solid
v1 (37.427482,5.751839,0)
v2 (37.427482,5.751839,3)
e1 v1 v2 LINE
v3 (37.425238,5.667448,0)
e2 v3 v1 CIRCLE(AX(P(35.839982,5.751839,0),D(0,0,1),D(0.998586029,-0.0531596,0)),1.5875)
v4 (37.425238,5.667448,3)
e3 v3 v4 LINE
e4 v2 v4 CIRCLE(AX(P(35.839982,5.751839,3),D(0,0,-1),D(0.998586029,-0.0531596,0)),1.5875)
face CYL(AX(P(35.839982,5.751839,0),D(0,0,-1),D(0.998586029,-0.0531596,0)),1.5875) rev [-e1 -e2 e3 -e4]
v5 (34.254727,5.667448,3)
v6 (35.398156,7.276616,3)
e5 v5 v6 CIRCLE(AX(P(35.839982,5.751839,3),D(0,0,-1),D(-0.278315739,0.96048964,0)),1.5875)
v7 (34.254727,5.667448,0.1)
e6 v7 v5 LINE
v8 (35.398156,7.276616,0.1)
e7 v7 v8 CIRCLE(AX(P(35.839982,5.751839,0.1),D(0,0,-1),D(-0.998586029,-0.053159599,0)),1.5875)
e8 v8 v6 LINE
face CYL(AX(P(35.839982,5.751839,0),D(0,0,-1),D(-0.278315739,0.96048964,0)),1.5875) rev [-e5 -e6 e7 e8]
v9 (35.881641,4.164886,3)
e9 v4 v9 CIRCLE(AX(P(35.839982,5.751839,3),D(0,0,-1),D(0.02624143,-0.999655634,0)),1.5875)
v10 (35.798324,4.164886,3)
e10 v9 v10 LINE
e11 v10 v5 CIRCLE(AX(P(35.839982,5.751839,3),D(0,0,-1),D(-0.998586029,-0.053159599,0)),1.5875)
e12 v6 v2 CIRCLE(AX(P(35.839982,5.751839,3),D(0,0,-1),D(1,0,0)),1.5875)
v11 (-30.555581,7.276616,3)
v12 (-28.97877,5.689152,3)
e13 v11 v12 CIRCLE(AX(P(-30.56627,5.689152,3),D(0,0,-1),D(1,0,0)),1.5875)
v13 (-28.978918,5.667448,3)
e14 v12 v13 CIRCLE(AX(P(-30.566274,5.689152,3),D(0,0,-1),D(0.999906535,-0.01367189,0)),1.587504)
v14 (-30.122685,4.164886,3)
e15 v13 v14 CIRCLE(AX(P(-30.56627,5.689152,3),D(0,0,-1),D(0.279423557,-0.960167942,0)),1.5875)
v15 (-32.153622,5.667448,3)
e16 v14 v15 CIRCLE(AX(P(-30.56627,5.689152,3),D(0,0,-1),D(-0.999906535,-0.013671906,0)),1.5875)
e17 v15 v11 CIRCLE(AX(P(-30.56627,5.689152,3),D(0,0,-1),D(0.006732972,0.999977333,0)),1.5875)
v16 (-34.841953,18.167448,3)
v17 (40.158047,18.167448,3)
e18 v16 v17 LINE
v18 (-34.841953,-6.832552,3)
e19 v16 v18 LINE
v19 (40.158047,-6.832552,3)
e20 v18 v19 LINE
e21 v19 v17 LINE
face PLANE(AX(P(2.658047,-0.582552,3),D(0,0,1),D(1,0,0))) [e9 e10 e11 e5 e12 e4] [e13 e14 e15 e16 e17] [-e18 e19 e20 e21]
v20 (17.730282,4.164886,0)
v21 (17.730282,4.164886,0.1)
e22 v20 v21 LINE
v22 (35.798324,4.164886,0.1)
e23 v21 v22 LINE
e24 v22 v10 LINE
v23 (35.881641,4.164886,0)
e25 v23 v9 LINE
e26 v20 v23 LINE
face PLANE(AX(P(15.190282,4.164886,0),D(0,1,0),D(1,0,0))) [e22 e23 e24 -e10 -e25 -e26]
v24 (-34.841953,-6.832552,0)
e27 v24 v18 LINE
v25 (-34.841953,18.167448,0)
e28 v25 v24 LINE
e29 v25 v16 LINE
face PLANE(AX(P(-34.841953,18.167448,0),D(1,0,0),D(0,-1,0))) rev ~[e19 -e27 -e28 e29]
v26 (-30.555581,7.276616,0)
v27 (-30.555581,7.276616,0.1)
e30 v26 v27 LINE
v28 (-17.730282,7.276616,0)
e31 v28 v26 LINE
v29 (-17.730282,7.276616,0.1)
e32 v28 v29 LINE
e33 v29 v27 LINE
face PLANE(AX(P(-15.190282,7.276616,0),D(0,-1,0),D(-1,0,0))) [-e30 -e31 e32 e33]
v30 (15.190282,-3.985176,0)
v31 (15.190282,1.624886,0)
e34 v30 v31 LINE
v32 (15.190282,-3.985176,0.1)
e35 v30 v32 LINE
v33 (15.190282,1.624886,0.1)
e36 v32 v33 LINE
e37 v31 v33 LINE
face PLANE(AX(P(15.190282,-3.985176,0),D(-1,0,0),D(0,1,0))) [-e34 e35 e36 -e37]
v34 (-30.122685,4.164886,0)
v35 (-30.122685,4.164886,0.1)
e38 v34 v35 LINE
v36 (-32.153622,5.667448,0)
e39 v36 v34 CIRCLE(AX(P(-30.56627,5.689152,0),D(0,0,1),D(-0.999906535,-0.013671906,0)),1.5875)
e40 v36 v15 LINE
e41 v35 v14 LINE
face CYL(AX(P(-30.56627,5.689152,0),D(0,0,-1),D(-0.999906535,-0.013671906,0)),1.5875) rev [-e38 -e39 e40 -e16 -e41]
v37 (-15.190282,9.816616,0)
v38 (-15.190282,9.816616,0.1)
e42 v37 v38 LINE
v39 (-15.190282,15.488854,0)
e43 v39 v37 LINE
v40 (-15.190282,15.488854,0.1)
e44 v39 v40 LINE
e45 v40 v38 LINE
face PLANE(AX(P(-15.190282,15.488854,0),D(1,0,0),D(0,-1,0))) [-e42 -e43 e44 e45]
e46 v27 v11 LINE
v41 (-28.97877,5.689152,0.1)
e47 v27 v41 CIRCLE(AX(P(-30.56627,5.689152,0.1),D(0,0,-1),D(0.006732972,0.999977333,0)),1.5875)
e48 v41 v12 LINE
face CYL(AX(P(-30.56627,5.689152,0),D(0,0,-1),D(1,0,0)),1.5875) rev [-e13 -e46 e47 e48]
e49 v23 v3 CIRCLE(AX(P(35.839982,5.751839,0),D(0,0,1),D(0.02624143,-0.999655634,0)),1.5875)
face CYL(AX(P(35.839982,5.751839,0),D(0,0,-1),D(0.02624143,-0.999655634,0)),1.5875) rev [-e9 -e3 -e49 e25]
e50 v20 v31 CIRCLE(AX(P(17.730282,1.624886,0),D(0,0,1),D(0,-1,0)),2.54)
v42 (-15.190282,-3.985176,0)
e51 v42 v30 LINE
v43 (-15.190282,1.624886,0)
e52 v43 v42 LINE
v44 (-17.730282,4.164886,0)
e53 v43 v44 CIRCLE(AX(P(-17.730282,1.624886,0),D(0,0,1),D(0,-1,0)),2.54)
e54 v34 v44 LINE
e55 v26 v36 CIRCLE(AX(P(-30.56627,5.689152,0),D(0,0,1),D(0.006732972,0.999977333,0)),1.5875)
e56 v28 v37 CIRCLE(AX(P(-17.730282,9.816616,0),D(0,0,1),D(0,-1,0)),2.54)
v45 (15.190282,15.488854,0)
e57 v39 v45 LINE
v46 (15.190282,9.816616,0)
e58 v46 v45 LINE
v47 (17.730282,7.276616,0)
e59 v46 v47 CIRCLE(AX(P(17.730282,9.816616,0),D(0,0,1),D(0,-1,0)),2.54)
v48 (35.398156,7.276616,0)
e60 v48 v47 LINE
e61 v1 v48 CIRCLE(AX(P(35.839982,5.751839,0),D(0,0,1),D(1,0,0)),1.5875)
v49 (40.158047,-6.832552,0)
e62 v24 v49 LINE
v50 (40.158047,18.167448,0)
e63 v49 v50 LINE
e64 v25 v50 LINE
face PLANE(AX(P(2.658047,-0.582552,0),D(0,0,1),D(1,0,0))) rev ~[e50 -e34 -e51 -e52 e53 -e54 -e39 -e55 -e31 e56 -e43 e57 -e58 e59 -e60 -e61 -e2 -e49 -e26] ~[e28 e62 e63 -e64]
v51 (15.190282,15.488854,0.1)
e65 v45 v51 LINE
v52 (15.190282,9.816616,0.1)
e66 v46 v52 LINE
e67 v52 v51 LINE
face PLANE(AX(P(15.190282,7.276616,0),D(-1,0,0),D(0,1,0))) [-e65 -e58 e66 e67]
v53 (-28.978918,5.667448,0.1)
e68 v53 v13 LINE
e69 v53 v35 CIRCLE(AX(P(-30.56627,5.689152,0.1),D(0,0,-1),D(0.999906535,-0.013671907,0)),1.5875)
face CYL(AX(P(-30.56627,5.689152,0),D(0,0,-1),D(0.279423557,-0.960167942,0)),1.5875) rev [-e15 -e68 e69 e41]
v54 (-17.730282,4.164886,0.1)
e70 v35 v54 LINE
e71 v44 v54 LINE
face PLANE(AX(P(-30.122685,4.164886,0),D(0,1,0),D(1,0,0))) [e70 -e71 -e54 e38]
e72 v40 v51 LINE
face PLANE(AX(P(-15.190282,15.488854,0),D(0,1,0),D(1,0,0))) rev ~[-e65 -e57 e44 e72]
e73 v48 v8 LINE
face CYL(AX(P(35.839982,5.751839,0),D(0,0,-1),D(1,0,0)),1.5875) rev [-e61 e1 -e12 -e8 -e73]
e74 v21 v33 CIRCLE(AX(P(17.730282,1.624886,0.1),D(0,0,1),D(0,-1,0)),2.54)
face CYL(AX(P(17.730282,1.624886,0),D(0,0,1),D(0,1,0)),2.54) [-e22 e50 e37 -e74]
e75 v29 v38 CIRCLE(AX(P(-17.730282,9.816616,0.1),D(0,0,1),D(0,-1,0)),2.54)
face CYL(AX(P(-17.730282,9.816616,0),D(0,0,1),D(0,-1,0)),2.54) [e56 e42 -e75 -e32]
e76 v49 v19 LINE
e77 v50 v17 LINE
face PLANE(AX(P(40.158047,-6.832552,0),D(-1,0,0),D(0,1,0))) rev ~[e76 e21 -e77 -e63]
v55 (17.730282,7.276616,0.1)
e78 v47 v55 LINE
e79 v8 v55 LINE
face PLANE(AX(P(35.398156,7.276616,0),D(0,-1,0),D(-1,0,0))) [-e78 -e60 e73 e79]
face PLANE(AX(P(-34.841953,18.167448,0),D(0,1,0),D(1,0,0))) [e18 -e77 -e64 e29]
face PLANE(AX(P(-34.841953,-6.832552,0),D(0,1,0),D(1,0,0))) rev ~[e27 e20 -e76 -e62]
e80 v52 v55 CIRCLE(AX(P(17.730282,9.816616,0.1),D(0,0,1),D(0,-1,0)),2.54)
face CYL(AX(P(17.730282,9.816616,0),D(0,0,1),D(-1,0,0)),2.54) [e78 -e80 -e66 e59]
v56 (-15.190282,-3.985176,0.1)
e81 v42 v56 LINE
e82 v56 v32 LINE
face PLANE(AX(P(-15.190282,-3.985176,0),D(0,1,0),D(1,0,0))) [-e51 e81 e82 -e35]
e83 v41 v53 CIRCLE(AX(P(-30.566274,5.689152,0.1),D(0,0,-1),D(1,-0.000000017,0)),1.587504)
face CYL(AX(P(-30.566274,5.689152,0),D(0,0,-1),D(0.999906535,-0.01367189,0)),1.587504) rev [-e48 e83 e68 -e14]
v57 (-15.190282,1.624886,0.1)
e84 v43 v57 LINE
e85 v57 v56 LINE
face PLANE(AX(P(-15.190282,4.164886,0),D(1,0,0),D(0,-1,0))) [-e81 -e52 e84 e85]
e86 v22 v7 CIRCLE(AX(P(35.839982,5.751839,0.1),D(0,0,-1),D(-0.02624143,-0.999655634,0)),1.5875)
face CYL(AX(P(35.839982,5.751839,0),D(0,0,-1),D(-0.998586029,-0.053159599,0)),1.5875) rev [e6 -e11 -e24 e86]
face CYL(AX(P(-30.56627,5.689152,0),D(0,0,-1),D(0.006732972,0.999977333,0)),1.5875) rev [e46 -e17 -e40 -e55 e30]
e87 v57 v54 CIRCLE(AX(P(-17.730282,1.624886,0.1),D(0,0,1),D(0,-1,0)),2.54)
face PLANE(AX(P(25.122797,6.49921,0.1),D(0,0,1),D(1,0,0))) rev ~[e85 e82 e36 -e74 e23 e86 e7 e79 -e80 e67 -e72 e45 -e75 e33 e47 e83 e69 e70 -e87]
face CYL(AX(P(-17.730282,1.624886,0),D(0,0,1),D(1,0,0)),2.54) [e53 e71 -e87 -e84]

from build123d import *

# Parameters (mm, degrees)
F0_W     = 75
F0_H     = 12.5
F2_DEPTH = 3
F3_DEPTH = 25.4
F1_W     = 30.3805638105
F1_H     = 1.609168168
F1_H_2   = 8.2122374663
F1_H_3   = 1.5025624558
F1_H_4   = 8.1500614509
F4_DEPTH = 0.1
F5_R     = 2.54


# Not quite as in the source:
# - a feature names something its author has since deleted; it is built from what else it names


with BuildPart() as f2:
    # F0 (on Top) → F2 (new body)
    with BuildSketch(Plane.XY):
        with Locations((2.6580473056, -0.5825519562)):
            Rectangle(F0_W, F0_H)
        with Locations((2.6580473056, 11.9174480438)):
            Rectangle(F0_W, F0_H)
    extrude(amount=F2_DEPTH)

    # F1 (on face) → F3 (cut)
    with BuildSketch(Plane.XY):
        with BuildLine():
            ThreePointArc((37.4252376516, 5.6674480438), (37.4269210618, 5.709628552), (37.4274823308, 5.7518389076))
            ThreePointArc((37.4274823308, 5.7518389076), (36.7935957485, 7.0210030812), (35.3981560952, 7.2766162118))
            Line((35.3981560952, 7.2766162118), (35.8816406012, 7.2766162118))
            Line((35.8816406012, 7.2766162118), (35.8816406012, 5.6674480438))
            Line((35.8816406012, 5.6674480438), (37.4252376516, 5.6674480438))
        make_face()
        with BuildLine():
            Line((35.8816406012, 7.2766162118), (35.3981560952, 7.2766162118))
            ThreePointArc((35.3981560952, 7.2766162118), (34.5459110587, 6.6713691097), (34.25472701, 5.6674480438))
            Line((34.25472701, 5.6674480438), (35.8816406012, 5.6674480438))
            Line((35.8816406012, 5.6674480438), (35.8816406012, 7.2766162118))
        make_face()
        with BuildLine():
            ThreePointArc((35.8816406012, 4.164885588), (36.9472923333, 4.6142885534), (37.4252376516, 5.6674480438))
            Line((37.4252376516, 5.6674480438), (35.8816406012, 5.6674480438))
            Line((35.8816406012, 5.6674480438), (35.8816406012, 4.164885588))
        make_face()
        with BuildLine():
            Line((35.8816406012, 5.6674480438), (34.25472701, 5.6674480438))
            ThreePointArc((34.25472701, 5.6674480438), (34.7326723283, 4.6142885534), (35.7983240604, 4.164885588))
            Line((35.7983240604, 4.164885588), (35.8816406012, 4.164885588))
            Line((35.8816406012, 4.164885588), (35.8816406012, 5.6674480438))
        make_face()
        with BuildLine():
            Line((-30.5555813976, 5.6674480438), (-30.5555813976, 7.2766162118))
            ThreePointArc((-30.5555813976, 7.2766162118), (-31.6926900402, 6.8077826631), (-32.1536216159, 5.6674480438))
            Line((-32.1536216159, 5.6674480438), (-30.5555813976, 5.6674480438))
        make_face()
        with BuildLine():
            ThreePointArc((-28.9787699914, 5.6891521952), (-29.4399653273, 6.8078988393), (-30.5555813976, 7.2766162118))
            Line((-30.5555813976, 7.2766162118), (-30.5555813976, 5.6674480438))
            Line((-30.5555813976, 5.6674480438), (-28.9789183669, 5.6674480438))
            ThreePointArc((-28.9789183669, 5.6674480438), (-28.9788070858, 5.678299866), (-28.9787699914, 5.6891521952))
        make_face()
        with BuildLine():
            ThreePointArc((-30.1226850953, 4.164885588), (-29.303099666, 4.7276133355), (-28.9789183669, 5.6674480438))
            Line((-28.9789183669, 5.6674480438), (-30.5555813976, 5.6674480438))
            Line((-30.5555813976, 5.6674480438), (-30.5555813976, 4.164885588))
            Line((-30.5555813976, 4.164885588), (-30.1226850953, 4.164885588))
        make_face()
        with BuildLine():
            Line((-30.5555813976, 5.6674480438), (-32.1536216159, 5.6674480438))
            ThreePointArc((-32.1536216159, 5.6674480438), (-31.5104490346, 4.4129538625), (-30.1226850953, 4.164885588))
            Line((-30.1226850953, 4.164885588), (-30.5555813976, 4.164885588))
            Line((-30.5555813976, 4.164885588), (-30.5555813976, 5.6674480438))
        make_face()
    extrude(amount=F3_DEPTH, mode=Mode.SUBTRACT)

    # F1 (on face) → F4 (cut)
    with BuildSketch(Plane.XY):
        with BuildLine():
            ThreePointArc((34.25472701, 5.6674480438), (34.5459110587, 6.6713691097), (35.3981560952, 7.2766162118))
            Line((35.3981560952, 7.2766162118), (15.1902819052, 7.2766162118))
            Line((15.1902819052, 7.2766162118), (15.1902819052, 5.6674480438))
            Line((15.1902819052, 5.6674480438), (34.25472701, 5.6674480438))
        make_face()
        with BuildLine():
            ThreePointArc((35.7983240604, 4.164885588), (34.7326723283, 4.6142885534), (34.25472701, 5.6674480438))
            Line((34.25472701, 5.6674480438), (15.1902819052, 5.6674480438))
            Line((15.1902819052, 5.6674480438), (15.1902819052, 4.164885588))
            Line((15.1902819052, 4.164885588), (35.7983240604, 4.164885588))
        make_face()
        with Locations((0, 6.4720321278)):
            Rectangle(F1_W, F1_H)
        with Locations((0, 11.382734945)):
            Rectangle(F1_W, F1_H_2)
        with Locations((0, 4.9161668159)):
            Rectangle(F1_W, F1_H_3)
        with BuildLine():
            Line((-15.1902819052, 5.6674480438), (-15.1902819052, 7.2766162118))
            Line((-15.1902819052, 7.2766162118), (-30.5555813976, 7.2766162118))
            ThreePointArc((-30.5555813976, 7.2766162118), (-29.4399653273, 6.8078988393), (-28.9787699914, 5.6891521952))
            ThreePointArc((-28.9787699914, 5.6891521952), (-28.9788070858, 5.678299866), (-28.9789183669, 5.6674480438))
            Line((-28.9789183669, 5.6674480438), (-15.1902819052, 5.6674480438))
        make_face()
        with Locations((0, 0.0898548626)):
            Rectangle(F1_W, F1_H_4)
        with BuildLine():
            Line((-15.1902819052, 4.164885588), (-15.1902819052, 5.6674480438))
            Line((-15.1902819052, 5.6674480438), (-28.9789183669, 5.6674480438))
            ThreePointArc((-28.9789183669, 5.6674480438), (-29.303099666, 4.7276133355), (-30.1226850953, 4.164885588))
            Line((-30.1226850953, 4.164885588), (-15.1902819052, 4.164885588))
        make_face()
    extrude(amount=F4_DEPTH, mode=Mode.SUBTRACT)

    # F5
    f5_edges = [f2.edges().sort_by_distance(p)[0] for p in [
        (-15.190282, 4.164886, 0.05),
        (-15.190282, 7.276616, 0.05),
        (15.190282, 4.164886, 0.05),
        (15.190282, 7.276616, 0.05),
    ]]
    fillet(f5_edges, radius=F5_R)


solid = f2.part
